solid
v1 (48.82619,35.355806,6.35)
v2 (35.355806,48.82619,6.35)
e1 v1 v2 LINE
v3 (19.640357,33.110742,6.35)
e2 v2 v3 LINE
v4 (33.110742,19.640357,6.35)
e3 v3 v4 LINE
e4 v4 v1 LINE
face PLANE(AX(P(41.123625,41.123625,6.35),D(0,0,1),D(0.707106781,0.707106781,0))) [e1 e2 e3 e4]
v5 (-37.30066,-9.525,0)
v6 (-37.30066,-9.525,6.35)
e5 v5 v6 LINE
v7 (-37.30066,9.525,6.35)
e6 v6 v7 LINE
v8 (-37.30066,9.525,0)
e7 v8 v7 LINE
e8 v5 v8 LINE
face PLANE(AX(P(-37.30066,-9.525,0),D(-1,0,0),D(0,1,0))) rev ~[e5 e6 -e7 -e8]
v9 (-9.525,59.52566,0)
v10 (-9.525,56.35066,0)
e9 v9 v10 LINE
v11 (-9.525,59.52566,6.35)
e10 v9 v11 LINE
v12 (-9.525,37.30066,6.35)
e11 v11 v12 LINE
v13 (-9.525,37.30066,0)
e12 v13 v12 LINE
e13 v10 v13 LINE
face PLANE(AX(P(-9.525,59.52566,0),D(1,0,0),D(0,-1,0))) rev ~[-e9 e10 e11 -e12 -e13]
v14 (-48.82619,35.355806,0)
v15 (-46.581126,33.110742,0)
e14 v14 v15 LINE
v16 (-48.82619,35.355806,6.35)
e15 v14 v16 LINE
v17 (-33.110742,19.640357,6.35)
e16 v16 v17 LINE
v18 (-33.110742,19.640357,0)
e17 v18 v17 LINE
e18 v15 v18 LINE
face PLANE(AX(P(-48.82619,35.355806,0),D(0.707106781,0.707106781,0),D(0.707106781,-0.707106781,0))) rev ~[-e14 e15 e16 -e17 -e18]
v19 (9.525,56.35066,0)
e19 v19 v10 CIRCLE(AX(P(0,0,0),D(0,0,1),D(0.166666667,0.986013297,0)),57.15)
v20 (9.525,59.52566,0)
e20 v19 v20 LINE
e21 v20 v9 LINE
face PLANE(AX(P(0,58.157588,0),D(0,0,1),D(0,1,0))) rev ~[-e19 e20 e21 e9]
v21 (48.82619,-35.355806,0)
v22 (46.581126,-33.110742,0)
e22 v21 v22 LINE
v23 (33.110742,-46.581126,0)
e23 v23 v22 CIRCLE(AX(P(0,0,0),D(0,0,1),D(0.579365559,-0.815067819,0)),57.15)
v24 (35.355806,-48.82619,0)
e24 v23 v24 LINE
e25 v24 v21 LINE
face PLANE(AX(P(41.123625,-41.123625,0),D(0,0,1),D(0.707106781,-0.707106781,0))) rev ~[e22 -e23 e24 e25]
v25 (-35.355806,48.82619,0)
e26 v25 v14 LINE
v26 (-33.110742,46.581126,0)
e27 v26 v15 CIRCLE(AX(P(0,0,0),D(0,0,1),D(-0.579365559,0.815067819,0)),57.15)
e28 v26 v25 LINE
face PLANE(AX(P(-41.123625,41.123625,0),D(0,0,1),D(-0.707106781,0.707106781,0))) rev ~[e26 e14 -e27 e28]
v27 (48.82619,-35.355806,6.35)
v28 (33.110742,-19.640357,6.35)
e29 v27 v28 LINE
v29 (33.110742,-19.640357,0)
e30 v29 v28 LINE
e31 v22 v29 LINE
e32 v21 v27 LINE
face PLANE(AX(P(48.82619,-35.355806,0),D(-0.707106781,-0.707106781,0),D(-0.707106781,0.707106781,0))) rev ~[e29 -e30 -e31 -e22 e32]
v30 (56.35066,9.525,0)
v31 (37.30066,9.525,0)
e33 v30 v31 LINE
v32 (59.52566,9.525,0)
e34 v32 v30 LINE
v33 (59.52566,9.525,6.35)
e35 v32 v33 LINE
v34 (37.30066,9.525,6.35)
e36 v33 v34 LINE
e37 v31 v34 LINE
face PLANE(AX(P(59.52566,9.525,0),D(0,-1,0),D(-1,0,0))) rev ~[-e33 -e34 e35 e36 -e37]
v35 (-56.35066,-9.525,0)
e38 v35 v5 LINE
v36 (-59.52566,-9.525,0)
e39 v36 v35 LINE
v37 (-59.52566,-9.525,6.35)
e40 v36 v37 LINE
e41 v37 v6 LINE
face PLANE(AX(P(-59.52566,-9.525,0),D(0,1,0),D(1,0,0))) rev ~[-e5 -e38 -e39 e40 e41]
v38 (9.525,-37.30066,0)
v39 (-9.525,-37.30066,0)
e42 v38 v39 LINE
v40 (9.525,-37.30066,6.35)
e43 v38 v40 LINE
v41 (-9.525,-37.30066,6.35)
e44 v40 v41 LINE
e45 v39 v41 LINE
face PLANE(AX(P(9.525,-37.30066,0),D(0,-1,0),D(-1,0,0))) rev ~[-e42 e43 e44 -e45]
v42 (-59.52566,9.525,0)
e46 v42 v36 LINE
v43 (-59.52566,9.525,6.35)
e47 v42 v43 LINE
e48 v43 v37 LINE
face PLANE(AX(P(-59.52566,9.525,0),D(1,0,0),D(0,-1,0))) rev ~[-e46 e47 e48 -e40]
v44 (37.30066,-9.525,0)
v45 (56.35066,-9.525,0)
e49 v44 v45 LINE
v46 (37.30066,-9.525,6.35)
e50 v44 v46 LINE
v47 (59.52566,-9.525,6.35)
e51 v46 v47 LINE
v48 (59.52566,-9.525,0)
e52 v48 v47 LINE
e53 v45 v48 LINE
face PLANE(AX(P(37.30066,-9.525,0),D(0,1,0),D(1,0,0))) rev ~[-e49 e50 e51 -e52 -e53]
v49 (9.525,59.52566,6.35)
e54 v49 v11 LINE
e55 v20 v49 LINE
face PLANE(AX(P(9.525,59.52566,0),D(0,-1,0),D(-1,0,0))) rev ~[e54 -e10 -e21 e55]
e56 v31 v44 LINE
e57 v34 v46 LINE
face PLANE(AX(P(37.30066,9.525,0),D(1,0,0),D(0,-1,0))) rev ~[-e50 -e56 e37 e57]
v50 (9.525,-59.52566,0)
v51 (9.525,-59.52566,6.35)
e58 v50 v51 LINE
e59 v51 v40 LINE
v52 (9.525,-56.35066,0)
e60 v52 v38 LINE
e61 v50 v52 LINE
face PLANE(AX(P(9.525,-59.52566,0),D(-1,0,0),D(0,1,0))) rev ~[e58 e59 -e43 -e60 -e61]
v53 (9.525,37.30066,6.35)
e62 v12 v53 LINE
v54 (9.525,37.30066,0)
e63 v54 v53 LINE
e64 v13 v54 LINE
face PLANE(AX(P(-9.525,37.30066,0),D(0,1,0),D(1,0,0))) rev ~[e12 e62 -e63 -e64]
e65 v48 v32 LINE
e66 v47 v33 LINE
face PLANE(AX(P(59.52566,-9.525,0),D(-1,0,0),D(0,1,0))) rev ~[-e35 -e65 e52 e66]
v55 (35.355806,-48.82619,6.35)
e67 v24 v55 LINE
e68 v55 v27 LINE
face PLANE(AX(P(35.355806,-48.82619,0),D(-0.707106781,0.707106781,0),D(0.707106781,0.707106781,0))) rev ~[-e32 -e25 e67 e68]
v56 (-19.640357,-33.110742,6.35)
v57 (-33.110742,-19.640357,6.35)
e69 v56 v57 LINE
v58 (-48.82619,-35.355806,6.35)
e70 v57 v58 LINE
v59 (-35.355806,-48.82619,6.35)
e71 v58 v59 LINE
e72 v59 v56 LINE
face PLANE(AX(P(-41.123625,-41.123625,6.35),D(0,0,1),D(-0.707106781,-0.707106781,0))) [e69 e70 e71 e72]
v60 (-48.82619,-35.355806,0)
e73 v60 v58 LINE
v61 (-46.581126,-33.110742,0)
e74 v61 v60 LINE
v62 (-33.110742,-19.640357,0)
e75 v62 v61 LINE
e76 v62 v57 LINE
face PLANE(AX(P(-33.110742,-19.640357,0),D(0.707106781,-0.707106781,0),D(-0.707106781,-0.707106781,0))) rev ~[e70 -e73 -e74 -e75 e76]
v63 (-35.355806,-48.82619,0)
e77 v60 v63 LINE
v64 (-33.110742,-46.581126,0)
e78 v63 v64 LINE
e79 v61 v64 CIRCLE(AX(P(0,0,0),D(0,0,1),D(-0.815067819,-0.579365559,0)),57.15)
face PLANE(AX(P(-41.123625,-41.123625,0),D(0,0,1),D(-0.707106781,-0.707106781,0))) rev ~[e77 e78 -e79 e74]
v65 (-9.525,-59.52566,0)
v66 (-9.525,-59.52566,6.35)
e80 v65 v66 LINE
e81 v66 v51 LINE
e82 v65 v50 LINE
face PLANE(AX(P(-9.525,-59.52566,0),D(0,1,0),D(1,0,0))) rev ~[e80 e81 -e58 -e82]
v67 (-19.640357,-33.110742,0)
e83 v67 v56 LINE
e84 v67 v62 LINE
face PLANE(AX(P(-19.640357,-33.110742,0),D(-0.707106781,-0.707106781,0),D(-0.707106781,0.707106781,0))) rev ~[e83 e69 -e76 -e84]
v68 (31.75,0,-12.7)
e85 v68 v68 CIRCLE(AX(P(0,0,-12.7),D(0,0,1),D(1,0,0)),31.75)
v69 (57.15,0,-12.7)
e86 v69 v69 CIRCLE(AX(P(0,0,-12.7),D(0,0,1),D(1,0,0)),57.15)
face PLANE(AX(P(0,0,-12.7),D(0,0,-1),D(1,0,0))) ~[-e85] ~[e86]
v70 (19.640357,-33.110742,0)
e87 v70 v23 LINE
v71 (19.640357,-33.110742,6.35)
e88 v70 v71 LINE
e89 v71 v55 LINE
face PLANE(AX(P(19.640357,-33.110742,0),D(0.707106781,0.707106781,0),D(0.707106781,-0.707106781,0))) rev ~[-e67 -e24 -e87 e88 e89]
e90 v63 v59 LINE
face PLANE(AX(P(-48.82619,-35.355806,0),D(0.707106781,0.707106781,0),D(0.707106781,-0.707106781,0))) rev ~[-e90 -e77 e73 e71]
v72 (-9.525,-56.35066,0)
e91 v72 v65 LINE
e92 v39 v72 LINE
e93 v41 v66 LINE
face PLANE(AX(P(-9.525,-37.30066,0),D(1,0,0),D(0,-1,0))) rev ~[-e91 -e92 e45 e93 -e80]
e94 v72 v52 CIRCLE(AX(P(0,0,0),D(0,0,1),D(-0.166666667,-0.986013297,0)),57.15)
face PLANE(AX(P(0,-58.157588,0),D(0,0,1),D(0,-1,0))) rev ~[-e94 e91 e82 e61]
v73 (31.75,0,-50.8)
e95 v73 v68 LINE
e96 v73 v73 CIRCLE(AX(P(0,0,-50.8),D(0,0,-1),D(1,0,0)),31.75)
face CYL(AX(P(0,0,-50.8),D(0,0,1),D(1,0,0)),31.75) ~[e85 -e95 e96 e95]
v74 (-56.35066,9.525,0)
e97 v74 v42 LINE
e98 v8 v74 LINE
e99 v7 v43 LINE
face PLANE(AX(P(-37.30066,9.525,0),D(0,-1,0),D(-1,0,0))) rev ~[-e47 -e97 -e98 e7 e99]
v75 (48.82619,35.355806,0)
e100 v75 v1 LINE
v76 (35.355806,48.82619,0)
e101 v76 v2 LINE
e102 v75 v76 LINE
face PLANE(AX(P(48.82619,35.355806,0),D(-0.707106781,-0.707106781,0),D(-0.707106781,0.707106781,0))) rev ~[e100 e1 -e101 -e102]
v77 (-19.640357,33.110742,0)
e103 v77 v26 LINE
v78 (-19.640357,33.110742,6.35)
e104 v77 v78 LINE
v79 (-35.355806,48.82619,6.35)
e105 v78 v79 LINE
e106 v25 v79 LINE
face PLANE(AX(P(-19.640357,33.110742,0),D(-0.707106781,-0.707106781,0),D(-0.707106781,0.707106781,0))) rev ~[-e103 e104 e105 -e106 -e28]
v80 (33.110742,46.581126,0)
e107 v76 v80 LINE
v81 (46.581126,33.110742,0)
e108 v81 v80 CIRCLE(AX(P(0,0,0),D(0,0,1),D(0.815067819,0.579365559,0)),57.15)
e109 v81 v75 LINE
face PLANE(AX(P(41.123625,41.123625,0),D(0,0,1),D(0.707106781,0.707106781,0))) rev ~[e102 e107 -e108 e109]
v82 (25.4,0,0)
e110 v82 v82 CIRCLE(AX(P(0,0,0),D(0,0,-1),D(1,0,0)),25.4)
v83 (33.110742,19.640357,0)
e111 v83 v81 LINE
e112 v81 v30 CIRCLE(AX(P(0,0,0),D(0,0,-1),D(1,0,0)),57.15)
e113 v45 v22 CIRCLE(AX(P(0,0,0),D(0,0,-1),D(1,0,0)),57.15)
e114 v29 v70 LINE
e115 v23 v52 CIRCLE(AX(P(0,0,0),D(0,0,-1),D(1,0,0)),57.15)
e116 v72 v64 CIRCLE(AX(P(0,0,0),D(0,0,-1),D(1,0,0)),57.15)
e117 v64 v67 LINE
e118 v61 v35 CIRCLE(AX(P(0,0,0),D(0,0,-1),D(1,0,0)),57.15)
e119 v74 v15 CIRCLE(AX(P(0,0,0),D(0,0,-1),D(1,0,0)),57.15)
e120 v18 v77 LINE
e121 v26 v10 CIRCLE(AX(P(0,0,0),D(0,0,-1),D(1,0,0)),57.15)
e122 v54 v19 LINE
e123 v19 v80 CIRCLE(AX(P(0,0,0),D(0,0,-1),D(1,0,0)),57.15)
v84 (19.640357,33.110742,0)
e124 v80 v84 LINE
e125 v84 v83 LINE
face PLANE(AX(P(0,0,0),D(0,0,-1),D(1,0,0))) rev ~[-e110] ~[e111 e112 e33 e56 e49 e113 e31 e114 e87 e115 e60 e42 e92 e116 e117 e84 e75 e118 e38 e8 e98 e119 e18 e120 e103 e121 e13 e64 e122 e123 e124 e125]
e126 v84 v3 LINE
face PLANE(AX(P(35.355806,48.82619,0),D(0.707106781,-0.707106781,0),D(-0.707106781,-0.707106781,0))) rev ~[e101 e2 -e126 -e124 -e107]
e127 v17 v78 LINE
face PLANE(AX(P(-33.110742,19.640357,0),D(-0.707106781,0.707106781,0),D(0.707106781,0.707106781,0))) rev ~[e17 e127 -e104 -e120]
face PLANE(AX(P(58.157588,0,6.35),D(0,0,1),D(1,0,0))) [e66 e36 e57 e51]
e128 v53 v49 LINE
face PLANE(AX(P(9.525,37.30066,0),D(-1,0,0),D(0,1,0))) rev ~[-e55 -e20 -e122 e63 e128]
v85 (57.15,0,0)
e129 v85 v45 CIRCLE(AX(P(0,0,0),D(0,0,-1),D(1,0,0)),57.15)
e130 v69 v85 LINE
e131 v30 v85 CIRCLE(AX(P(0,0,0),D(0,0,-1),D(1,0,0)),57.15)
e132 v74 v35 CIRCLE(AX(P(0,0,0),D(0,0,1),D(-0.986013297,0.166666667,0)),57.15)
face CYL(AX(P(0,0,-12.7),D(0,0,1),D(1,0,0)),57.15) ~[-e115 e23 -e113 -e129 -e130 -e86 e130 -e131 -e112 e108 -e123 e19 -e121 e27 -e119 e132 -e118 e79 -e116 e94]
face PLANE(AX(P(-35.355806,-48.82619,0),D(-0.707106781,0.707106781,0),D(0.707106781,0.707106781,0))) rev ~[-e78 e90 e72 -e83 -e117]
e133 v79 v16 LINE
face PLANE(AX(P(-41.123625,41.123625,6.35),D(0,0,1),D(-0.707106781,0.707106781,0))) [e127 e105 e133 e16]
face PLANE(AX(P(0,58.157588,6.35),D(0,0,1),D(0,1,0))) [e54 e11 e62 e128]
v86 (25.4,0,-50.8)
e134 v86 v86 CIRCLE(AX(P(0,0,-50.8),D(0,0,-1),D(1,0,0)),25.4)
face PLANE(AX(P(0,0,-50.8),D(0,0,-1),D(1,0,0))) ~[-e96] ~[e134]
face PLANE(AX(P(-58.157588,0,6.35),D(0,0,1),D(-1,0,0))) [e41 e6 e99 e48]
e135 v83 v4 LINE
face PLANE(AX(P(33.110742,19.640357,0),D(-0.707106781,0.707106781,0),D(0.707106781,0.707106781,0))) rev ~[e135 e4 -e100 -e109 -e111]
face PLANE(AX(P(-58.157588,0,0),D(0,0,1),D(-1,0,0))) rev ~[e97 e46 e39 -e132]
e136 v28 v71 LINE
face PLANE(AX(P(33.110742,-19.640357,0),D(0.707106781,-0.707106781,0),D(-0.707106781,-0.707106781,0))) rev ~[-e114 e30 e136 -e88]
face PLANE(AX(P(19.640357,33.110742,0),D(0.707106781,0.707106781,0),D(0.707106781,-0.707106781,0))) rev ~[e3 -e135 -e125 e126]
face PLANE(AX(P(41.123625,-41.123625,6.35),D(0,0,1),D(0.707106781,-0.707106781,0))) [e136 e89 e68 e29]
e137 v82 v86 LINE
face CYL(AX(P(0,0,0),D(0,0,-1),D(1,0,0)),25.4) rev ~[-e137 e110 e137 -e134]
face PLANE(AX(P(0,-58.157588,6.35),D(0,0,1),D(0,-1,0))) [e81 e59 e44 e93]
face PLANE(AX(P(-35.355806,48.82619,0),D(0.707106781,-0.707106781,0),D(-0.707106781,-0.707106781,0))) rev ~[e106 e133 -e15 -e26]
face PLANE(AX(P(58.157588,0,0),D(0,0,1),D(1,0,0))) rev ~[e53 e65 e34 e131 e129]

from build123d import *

# Parameters (mm, degrees)
F4_DEPTH = 6.35
F5_COUNT = 8


# Not quite as in the source:
# - a feature names something its author has since deleted; it is built from what else it names


with BuildPart() as f1:
    # F0 (on Front) → F1 (revolve)
    with BuildSketch(Plane.XZ):
        Polygon((25.4, 0), (25.4, -50.8), (31.75, -50.8), (31.75, -12.7), (57.15, -12.7), (57.15, 0), align=None)
    revolve(axis=Axis((0, 0, 2.673143521), (0, 0, -1)))

    # F2 (on face) → F4 (join)
    with BuildSketch(Plane.XY):
        with BuildLine():
            ThreePointArc((57.15, 0), (56.9498143774, -4.779240775), (56.350659934, -9.525))
            Line((56.350659934, -9.525), (59.525659934, -9.525))
            Line((59.525659934, -9.525), (59.525659934, 9.525))
            Line((59.525659934, 9.525), (56.350659934, 9.525))
            ThreePointArc((56.350659934, 9.525), (56.9498143774, 4.779240775), (57.15, 0))
        make_face()
        with BuildLine():
            Line((37.300659934, 9.525), (37.300659934, -9.525))
            Line((37.300659934, -9.525), (56.350659934, -9.525))
            ThreePointArc((56.350659934, -9.525), (56.9498143774, -4.779240775), (57.15, 0))
            ThreePointArc((57.15, 0), (56.9498143774, 4.779240775), (56.350659934, 9.525))
            Line((56.350659934, 9.525), (37.300659934, 9.525))
        make_face()
    extrude(amount=F4_DEPTH)

    # F5: F1 ×8 about axis
    f5_axis = Axis((0, 0, 22.2758), (0, 0, 1))


with BuildPart() as f1_1:
    add(f1.part)
    for i in range(1, F5_COUNT):
        add(f1.part.rotate(f5_axis, i * 360 / F5_COUNT))


solid = f1_1.part
